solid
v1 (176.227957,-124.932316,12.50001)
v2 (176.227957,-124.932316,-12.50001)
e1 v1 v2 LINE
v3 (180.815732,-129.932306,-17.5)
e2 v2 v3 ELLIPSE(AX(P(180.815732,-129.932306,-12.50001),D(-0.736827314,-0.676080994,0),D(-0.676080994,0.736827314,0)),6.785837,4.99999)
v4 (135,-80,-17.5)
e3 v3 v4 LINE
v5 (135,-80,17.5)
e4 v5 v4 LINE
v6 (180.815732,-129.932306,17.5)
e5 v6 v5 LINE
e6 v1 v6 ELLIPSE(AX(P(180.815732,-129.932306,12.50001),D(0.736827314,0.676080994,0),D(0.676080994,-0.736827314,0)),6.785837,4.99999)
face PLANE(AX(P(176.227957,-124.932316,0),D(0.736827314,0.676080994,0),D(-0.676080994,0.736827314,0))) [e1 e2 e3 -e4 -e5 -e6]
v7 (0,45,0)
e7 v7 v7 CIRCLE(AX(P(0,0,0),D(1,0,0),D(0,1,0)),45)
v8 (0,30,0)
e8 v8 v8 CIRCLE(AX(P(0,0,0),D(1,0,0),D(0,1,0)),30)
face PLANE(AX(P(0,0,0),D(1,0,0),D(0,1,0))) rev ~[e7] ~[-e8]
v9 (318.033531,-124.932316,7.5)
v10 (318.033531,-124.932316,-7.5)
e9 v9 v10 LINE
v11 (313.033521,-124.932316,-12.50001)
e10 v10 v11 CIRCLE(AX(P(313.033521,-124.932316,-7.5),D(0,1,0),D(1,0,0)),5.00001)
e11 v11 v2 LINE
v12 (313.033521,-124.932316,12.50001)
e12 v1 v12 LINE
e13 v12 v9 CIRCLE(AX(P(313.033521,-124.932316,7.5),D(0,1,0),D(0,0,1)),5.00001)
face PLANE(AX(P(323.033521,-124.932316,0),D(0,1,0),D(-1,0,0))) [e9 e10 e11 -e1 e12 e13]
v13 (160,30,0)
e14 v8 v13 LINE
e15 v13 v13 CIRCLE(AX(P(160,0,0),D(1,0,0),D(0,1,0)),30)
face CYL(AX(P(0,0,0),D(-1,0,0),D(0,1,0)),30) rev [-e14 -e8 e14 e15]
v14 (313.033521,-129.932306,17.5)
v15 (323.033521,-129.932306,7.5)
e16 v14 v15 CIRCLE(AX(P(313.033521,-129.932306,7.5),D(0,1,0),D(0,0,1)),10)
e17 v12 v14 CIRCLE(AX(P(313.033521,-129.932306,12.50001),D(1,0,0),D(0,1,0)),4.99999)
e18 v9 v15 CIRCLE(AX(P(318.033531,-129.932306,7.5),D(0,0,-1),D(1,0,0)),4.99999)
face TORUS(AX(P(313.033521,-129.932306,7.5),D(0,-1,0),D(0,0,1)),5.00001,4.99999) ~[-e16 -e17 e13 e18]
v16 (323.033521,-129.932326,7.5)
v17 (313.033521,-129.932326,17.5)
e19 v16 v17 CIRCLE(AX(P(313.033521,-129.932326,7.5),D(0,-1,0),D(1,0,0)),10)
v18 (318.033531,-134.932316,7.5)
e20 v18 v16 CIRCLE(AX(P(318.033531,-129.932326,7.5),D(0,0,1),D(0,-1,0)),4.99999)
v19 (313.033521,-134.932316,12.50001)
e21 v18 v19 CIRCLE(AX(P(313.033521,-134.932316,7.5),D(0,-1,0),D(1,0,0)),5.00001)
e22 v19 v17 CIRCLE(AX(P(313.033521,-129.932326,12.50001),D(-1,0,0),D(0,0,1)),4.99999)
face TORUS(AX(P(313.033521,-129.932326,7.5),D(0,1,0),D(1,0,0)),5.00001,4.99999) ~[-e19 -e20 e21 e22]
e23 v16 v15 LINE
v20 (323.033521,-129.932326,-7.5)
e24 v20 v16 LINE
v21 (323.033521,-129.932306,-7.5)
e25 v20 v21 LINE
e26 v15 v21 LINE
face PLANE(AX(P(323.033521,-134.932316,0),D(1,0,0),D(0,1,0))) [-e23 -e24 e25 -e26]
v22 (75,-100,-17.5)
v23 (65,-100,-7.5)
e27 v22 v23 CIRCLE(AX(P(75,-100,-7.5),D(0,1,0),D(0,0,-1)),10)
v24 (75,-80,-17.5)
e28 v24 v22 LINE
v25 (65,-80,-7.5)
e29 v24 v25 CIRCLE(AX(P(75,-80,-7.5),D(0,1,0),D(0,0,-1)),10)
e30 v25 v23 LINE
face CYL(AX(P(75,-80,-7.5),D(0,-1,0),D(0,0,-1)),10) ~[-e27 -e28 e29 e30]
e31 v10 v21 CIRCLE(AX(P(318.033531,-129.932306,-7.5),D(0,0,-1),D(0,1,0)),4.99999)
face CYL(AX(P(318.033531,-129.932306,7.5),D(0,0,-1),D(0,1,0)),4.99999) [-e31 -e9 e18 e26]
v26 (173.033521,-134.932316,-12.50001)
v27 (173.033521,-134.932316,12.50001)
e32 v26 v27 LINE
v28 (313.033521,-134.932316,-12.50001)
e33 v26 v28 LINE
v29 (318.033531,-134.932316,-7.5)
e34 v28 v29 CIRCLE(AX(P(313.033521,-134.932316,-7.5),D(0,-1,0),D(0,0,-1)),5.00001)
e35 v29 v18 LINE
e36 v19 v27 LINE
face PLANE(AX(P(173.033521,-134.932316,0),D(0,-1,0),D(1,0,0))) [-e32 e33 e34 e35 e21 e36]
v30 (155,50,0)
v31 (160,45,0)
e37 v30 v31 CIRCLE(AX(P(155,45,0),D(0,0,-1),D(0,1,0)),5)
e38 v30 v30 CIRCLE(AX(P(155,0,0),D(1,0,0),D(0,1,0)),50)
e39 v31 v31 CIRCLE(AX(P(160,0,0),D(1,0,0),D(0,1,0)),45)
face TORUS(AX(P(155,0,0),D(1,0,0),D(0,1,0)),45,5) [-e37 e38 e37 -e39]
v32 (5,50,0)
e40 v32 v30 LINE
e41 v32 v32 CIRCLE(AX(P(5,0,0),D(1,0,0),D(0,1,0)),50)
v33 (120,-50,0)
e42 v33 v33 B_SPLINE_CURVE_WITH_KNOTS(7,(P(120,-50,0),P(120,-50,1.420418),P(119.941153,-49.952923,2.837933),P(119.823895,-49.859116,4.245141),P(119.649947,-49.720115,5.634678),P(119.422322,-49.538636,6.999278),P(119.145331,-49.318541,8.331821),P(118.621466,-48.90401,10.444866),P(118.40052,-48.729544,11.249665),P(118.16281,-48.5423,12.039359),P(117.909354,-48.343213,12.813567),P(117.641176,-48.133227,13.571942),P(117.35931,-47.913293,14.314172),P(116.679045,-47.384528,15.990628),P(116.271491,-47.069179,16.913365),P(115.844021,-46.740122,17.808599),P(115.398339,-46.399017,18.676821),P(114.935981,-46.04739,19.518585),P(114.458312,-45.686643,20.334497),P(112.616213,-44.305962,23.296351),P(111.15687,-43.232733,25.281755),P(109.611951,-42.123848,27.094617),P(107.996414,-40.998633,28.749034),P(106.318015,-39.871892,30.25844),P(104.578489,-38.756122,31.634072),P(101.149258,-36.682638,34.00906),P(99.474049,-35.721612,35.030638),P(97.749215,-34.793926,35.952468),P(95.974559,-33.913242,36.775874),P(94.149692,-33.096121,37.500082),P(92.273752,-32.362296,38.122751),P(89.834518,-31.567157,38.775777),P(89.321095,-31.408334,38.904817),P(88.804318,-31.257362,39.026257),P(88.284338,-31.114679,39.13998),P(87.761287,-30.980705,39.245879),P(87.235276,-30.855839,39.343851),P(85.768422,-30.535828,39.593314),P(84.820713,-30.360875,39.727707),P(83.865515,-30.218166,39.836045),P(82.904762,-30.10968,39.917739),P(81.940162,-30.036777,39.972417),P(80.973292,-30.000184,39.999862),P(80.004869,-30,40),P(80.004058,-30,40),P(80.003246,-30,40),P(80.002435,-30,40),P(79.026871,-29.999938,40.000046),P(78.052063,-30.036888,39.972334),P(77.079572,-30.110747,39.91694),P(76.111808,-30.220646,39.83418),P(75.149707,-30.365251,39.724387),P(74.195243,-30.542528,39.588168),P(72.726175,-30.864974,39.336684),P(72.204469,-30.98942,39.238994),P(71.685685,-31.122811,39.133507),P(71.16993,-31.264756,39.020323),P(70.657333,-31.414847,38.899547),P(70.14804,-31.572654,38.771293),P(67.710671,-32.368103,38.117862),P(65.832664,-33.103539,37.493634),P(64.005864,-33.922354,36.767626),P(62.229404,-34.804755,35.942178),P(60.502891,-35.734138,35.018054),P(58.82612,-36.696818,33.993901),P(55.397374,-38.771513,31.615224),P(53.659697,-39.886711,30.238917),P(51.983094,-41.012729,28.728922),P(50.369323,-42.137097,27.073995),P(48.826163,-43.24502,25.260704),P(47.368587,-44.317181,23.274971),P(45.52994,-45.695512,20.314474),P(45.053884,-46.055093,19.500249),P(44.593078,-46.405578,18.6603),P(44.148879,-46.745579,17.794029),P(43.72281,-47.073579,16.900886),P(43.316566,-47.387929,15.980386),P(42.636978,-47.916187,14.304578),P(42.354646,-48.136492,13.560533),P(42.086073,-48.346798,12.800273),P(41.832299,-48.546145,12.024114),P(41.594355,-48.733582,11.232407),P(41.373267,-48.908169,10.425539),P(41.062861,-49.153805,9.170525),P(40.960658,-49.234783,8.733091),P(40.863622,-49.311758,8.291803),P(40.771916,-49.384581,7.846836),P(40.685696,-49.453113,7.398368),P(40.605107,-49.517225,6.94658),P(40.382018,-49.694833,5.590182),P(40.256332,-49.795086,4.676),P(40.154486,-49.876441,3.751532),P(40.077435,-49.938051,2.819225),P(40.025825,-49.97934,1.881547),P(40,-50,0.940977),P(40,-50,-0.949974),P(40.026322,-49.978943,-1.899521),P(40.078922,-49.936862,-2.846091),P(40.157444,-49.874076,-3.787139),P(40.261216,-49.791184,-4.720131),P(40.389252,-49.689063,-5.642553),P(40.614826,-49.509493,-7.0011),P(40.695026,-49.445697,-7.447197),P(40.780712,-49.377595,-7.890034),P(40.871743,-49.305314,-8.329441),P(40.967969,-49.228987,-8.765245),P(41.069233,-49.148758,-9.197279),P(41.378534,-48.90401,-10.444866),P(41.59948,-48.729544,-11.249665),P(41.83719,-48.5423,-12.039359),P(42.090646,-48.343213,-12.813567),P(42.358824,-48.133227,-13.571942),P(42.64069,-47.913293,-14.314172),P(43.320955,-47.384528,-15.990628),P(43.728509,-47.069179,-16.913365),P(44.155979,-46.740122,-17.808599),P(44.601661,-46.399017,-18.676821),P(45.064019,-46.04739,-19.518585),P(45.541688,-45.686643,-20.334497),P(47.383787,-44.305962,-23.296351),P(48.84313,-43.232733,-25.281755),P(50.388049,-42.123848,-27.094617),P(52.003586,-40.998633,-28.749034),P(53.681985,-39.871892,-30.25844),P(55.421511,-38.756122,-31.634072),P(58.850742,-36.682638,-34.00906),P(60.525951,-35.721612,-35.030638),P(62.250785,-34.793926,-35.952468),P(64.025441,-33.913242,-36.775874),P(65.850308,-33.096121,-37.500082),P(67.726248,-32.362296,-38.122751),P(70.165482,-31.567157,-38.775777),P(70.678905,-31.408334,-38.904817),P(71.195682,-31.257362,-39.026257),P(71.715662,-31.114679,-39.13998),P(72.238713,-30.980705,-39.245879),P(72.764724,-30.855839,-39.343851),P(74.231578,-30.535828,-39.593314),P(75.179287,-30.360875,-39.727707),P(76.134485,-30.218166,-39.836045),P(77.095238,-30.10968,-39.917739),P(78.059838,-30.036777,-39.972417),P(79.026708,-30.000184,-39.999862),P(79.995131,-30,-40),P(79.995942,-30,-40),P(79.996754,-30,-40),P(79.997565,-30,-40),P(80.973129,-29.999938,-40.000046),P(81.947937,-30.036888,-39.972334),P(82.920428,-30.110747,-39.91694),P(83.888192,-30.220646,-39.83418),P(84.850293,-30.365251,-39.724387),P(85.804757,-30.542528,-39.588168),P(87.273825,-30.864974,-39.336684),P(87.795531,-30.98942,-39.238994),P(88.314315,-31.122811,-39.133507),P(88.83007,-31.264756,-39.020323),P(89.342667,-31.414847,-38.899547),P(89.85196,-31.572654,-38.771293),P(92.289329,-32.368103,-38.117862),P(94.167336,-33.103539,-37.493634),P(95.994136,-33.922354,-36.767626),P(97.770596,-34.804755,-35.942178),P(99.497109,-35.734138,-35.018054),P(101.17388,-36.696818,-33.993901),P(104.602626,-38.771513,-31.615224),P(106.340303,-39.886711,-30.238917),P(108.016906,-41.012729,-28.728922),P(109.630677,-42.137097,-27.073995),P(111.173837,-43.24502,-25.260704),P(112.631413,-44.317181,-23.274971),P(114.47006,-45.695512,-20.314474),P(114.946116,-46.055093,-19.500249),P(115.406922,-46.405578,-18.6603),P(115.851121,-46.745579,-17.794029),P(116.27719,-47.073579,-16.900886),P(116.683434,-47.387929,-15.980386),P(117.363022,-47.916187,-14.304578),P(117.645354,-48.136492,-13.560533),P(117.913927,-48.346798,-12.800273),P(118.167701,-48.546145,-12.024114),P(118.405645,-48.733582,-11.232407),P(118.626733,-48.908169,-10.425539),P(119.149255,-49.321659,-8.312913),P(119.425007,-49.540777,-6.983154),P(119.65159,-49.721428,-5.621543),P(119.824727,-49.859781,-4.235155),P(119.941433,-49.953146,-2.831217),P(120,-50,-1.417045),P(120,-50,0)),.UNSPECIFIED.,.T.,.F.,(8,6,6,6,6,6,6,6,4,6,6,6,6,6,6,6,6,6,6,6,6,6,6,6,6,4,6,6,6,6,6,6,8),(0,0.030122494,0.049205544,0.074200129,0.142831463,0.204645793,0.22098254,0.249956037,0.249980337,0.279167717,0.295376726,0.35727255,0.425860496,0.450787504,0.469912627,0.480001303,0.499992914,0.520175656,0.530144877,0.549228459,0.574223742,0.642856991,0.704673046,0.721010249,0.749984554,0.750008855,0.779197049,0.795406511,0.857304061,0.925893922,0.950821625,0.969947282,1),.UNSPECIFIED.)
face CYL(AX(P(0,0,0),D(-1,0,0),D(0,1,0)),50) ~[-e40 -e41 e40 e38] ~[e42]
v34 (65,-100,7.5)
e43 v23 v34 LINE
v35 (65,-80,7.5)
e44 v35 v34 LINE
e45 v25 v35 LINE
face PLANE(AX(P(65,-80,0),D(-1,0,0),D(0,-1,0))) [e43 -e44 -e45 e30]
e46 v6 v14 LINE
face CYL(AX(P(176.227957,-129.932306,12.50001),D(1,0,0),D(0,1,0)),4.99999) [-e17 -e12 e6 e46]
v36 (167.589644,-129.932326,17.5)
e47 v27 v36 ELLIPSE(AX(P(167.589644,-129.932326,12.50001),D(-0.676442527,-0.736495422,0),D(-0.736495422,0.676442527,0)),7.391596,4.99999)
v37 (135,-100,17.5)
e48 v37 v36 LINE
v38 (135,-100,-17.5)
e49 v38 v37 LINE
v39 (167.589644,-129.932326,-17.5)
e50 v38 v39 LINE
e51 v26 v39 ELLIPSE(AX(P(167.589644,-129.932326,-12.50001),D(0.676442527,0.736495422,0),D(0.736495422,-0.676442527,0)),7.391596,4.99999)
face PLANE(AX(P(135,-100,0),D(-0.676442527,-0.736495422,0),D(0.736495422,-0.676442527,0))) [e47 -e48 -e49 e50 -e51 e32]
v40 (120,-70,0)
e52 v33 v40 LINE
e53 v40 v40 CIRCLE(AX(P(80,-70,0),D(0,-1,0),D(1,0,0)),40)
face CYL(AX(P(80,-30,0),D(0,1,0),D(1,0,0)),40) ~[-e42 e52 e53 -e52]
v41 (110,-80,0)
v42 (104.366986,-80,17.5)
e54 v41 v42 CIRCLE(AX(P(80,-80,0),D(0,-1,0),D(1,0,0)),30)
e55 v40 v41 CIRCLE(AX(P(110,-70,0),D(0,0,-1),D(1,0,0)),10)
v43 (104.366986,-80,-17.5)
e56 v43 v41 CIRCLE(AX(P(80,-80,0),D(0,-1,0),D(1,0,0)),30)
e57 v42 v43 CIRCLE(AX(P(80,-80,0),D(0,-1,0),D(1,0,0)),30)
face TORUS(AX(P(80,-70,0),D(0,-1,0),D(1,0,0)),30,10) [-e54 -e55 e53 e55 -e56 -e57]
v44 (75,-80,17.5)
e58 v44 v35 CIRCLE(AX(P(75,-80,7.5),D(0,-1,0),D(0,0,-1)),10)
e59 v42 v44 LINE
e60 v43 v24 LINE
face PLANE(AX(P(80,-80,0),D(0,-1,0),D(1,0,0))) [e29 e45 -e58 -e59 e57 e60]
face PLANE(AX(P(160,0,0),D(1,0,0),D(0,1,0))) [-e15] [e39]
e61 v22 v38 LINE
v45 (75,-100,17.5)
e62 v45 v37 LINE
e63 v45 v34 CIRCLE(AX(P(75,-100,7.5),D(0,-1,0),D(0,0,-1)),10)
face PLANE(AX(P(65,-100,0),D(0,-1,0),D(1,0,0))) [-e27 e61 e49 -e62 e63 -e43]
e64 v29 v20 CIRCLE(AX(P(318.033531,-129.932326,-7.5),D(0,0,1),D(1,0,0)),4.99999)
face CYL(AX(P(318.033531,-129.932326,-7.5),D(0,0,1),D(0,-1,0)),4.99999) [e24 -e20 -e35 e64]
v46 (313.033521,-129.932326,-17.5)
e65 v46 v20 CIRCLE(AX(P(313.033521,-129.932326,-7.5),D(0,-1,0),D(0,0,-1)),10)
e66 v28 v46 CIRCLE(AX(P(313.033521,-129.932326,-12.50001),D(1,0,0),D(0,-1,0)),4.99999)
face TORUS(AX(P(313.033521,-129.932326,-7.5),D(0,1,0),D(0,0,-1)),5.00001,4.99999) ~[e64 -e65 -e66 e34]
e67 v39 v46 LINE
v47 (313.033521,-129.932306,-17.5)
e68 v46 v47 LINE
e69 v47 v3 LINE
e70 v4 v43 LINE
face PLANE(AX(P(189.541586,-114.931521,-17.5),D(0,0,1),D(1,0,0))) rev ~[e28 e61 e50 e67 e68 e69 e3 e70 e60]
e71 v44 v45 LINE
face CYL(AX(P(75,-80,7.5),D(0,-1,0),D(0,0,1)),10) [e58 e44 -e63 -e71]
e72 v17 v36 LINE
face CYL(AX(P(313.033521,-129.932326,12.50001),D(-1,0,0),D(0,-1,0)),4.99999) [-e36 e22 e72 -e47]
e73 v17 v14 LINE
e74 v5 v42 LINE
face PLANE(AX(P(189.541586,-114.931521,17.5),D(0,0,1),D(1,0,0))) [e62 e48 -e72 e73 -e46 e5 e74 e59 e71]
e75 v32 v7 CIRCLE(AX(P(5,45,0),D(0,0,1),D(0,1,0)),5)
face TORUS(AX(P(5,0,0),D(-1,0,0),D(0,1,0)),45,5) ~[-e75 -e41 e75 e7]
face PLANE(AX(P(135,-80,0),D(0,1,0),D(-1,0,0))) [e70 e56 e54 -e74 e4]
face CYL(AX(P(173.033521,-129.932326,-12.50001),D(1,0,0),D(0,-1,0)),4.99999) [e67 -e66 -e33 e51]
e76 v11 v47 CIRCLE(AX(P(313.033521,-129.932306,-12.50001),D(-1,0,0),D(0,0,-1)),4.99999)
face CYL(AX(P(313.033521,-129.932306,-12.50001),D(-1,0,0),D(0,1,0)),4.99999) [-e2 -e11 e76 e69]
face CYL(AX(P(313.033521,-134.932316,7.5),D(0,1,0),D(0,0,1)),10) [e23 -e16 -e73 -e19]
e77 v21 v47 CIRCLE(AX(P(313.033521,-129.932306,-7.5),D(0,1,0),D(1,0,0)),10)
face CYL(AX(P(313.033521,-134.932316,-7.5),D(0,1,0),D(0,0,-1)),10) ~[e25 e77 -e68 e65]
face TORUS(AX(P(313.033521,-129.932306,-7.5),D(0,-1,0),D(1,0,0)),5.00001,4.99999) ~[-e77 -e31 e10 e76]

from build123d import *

# Parameters (mm, degrees)
F0_R     = 50
F0_R_2   = 30
F1_DEPTH = 160
F3_START = 30
F2_R     = 40
F3_DEPTH = 50
F4_R     = 10
F6_DEPTH = 17.5
F7_R     = 10
F8_R     = 4.99999
F9_R     = 5


# Not quite as in the source:
# - a fillet or chamfer is up to 0.001 mm smaller than in the source, because OpenCascade refuses the exact size


with BuildPart() as f1:
    # F0 (on Right) → F1 (new body)
    with BuildSketch(Plane.YZ):
        Circle(F0_R)
        Circle(F0_R_2, mode=Mode.SUBTRACT)
    extrude(amount=F1_DEPTH)

    # F2 (on Front) → F3 (join)
    with BuildSketch(Plane.XZ.offset(F3_START)):
        with Locations((80, 0)):
            Circle(F2_R)
    extrude(amount=F3_DEPTH)

    # F4
    f4_edges = [f1.edges().sort_by_distance(p)[0] for p in [
        (40, -80, 0),
    ]]
    fillet(f4_edges, radius=F4_R)

    # F5 (on Top) → F6 (join, symmetric)
    with BuildSketch(Plane.XY):
        Polygon((135, -80), (110, -80), (65, -80), (65, -100), (135, -100), (173.0335205793, -134.9323159456), (323.0335205793, -134.9323159456), (323.0335205793, -124.9323159456), (176.2279570103, -124.9323159456), align=None)
    extrude(amount=F6_DEPTH, both=True)

    # F7
    f7_edges = [f1.edges().sort_by_distance(p)[0] for p in [
        (65, -90, -17.5),
        (65, -90, 17.5),
        (323.033521, -129.932316, -17.5),
        (323.033521, -129.932316, 17.5),
    ]]
    fillet(f7_edges, radius=F7_R)

    # F8 (radius 5 in the source; OpenCascade refuses exactly that, so slightly less here)
    f8_edges = [f1.edges().sort_by_distance(p)[0] for p in [
        (243.033521, -134.932316, -17.5),
        (244.630739, -124.932316, -17.5),
    ]]
    fillet(f8_edges, radius=F8_R)

    # F9
    f9_edges = [f1.edges().sort_by_distance(p)[0] for p in [
        (160, -50, 0),
        (0, -50, 0),
    ]]
    fillet(f9_edges, radius=F9_R)


solid = f1.part
